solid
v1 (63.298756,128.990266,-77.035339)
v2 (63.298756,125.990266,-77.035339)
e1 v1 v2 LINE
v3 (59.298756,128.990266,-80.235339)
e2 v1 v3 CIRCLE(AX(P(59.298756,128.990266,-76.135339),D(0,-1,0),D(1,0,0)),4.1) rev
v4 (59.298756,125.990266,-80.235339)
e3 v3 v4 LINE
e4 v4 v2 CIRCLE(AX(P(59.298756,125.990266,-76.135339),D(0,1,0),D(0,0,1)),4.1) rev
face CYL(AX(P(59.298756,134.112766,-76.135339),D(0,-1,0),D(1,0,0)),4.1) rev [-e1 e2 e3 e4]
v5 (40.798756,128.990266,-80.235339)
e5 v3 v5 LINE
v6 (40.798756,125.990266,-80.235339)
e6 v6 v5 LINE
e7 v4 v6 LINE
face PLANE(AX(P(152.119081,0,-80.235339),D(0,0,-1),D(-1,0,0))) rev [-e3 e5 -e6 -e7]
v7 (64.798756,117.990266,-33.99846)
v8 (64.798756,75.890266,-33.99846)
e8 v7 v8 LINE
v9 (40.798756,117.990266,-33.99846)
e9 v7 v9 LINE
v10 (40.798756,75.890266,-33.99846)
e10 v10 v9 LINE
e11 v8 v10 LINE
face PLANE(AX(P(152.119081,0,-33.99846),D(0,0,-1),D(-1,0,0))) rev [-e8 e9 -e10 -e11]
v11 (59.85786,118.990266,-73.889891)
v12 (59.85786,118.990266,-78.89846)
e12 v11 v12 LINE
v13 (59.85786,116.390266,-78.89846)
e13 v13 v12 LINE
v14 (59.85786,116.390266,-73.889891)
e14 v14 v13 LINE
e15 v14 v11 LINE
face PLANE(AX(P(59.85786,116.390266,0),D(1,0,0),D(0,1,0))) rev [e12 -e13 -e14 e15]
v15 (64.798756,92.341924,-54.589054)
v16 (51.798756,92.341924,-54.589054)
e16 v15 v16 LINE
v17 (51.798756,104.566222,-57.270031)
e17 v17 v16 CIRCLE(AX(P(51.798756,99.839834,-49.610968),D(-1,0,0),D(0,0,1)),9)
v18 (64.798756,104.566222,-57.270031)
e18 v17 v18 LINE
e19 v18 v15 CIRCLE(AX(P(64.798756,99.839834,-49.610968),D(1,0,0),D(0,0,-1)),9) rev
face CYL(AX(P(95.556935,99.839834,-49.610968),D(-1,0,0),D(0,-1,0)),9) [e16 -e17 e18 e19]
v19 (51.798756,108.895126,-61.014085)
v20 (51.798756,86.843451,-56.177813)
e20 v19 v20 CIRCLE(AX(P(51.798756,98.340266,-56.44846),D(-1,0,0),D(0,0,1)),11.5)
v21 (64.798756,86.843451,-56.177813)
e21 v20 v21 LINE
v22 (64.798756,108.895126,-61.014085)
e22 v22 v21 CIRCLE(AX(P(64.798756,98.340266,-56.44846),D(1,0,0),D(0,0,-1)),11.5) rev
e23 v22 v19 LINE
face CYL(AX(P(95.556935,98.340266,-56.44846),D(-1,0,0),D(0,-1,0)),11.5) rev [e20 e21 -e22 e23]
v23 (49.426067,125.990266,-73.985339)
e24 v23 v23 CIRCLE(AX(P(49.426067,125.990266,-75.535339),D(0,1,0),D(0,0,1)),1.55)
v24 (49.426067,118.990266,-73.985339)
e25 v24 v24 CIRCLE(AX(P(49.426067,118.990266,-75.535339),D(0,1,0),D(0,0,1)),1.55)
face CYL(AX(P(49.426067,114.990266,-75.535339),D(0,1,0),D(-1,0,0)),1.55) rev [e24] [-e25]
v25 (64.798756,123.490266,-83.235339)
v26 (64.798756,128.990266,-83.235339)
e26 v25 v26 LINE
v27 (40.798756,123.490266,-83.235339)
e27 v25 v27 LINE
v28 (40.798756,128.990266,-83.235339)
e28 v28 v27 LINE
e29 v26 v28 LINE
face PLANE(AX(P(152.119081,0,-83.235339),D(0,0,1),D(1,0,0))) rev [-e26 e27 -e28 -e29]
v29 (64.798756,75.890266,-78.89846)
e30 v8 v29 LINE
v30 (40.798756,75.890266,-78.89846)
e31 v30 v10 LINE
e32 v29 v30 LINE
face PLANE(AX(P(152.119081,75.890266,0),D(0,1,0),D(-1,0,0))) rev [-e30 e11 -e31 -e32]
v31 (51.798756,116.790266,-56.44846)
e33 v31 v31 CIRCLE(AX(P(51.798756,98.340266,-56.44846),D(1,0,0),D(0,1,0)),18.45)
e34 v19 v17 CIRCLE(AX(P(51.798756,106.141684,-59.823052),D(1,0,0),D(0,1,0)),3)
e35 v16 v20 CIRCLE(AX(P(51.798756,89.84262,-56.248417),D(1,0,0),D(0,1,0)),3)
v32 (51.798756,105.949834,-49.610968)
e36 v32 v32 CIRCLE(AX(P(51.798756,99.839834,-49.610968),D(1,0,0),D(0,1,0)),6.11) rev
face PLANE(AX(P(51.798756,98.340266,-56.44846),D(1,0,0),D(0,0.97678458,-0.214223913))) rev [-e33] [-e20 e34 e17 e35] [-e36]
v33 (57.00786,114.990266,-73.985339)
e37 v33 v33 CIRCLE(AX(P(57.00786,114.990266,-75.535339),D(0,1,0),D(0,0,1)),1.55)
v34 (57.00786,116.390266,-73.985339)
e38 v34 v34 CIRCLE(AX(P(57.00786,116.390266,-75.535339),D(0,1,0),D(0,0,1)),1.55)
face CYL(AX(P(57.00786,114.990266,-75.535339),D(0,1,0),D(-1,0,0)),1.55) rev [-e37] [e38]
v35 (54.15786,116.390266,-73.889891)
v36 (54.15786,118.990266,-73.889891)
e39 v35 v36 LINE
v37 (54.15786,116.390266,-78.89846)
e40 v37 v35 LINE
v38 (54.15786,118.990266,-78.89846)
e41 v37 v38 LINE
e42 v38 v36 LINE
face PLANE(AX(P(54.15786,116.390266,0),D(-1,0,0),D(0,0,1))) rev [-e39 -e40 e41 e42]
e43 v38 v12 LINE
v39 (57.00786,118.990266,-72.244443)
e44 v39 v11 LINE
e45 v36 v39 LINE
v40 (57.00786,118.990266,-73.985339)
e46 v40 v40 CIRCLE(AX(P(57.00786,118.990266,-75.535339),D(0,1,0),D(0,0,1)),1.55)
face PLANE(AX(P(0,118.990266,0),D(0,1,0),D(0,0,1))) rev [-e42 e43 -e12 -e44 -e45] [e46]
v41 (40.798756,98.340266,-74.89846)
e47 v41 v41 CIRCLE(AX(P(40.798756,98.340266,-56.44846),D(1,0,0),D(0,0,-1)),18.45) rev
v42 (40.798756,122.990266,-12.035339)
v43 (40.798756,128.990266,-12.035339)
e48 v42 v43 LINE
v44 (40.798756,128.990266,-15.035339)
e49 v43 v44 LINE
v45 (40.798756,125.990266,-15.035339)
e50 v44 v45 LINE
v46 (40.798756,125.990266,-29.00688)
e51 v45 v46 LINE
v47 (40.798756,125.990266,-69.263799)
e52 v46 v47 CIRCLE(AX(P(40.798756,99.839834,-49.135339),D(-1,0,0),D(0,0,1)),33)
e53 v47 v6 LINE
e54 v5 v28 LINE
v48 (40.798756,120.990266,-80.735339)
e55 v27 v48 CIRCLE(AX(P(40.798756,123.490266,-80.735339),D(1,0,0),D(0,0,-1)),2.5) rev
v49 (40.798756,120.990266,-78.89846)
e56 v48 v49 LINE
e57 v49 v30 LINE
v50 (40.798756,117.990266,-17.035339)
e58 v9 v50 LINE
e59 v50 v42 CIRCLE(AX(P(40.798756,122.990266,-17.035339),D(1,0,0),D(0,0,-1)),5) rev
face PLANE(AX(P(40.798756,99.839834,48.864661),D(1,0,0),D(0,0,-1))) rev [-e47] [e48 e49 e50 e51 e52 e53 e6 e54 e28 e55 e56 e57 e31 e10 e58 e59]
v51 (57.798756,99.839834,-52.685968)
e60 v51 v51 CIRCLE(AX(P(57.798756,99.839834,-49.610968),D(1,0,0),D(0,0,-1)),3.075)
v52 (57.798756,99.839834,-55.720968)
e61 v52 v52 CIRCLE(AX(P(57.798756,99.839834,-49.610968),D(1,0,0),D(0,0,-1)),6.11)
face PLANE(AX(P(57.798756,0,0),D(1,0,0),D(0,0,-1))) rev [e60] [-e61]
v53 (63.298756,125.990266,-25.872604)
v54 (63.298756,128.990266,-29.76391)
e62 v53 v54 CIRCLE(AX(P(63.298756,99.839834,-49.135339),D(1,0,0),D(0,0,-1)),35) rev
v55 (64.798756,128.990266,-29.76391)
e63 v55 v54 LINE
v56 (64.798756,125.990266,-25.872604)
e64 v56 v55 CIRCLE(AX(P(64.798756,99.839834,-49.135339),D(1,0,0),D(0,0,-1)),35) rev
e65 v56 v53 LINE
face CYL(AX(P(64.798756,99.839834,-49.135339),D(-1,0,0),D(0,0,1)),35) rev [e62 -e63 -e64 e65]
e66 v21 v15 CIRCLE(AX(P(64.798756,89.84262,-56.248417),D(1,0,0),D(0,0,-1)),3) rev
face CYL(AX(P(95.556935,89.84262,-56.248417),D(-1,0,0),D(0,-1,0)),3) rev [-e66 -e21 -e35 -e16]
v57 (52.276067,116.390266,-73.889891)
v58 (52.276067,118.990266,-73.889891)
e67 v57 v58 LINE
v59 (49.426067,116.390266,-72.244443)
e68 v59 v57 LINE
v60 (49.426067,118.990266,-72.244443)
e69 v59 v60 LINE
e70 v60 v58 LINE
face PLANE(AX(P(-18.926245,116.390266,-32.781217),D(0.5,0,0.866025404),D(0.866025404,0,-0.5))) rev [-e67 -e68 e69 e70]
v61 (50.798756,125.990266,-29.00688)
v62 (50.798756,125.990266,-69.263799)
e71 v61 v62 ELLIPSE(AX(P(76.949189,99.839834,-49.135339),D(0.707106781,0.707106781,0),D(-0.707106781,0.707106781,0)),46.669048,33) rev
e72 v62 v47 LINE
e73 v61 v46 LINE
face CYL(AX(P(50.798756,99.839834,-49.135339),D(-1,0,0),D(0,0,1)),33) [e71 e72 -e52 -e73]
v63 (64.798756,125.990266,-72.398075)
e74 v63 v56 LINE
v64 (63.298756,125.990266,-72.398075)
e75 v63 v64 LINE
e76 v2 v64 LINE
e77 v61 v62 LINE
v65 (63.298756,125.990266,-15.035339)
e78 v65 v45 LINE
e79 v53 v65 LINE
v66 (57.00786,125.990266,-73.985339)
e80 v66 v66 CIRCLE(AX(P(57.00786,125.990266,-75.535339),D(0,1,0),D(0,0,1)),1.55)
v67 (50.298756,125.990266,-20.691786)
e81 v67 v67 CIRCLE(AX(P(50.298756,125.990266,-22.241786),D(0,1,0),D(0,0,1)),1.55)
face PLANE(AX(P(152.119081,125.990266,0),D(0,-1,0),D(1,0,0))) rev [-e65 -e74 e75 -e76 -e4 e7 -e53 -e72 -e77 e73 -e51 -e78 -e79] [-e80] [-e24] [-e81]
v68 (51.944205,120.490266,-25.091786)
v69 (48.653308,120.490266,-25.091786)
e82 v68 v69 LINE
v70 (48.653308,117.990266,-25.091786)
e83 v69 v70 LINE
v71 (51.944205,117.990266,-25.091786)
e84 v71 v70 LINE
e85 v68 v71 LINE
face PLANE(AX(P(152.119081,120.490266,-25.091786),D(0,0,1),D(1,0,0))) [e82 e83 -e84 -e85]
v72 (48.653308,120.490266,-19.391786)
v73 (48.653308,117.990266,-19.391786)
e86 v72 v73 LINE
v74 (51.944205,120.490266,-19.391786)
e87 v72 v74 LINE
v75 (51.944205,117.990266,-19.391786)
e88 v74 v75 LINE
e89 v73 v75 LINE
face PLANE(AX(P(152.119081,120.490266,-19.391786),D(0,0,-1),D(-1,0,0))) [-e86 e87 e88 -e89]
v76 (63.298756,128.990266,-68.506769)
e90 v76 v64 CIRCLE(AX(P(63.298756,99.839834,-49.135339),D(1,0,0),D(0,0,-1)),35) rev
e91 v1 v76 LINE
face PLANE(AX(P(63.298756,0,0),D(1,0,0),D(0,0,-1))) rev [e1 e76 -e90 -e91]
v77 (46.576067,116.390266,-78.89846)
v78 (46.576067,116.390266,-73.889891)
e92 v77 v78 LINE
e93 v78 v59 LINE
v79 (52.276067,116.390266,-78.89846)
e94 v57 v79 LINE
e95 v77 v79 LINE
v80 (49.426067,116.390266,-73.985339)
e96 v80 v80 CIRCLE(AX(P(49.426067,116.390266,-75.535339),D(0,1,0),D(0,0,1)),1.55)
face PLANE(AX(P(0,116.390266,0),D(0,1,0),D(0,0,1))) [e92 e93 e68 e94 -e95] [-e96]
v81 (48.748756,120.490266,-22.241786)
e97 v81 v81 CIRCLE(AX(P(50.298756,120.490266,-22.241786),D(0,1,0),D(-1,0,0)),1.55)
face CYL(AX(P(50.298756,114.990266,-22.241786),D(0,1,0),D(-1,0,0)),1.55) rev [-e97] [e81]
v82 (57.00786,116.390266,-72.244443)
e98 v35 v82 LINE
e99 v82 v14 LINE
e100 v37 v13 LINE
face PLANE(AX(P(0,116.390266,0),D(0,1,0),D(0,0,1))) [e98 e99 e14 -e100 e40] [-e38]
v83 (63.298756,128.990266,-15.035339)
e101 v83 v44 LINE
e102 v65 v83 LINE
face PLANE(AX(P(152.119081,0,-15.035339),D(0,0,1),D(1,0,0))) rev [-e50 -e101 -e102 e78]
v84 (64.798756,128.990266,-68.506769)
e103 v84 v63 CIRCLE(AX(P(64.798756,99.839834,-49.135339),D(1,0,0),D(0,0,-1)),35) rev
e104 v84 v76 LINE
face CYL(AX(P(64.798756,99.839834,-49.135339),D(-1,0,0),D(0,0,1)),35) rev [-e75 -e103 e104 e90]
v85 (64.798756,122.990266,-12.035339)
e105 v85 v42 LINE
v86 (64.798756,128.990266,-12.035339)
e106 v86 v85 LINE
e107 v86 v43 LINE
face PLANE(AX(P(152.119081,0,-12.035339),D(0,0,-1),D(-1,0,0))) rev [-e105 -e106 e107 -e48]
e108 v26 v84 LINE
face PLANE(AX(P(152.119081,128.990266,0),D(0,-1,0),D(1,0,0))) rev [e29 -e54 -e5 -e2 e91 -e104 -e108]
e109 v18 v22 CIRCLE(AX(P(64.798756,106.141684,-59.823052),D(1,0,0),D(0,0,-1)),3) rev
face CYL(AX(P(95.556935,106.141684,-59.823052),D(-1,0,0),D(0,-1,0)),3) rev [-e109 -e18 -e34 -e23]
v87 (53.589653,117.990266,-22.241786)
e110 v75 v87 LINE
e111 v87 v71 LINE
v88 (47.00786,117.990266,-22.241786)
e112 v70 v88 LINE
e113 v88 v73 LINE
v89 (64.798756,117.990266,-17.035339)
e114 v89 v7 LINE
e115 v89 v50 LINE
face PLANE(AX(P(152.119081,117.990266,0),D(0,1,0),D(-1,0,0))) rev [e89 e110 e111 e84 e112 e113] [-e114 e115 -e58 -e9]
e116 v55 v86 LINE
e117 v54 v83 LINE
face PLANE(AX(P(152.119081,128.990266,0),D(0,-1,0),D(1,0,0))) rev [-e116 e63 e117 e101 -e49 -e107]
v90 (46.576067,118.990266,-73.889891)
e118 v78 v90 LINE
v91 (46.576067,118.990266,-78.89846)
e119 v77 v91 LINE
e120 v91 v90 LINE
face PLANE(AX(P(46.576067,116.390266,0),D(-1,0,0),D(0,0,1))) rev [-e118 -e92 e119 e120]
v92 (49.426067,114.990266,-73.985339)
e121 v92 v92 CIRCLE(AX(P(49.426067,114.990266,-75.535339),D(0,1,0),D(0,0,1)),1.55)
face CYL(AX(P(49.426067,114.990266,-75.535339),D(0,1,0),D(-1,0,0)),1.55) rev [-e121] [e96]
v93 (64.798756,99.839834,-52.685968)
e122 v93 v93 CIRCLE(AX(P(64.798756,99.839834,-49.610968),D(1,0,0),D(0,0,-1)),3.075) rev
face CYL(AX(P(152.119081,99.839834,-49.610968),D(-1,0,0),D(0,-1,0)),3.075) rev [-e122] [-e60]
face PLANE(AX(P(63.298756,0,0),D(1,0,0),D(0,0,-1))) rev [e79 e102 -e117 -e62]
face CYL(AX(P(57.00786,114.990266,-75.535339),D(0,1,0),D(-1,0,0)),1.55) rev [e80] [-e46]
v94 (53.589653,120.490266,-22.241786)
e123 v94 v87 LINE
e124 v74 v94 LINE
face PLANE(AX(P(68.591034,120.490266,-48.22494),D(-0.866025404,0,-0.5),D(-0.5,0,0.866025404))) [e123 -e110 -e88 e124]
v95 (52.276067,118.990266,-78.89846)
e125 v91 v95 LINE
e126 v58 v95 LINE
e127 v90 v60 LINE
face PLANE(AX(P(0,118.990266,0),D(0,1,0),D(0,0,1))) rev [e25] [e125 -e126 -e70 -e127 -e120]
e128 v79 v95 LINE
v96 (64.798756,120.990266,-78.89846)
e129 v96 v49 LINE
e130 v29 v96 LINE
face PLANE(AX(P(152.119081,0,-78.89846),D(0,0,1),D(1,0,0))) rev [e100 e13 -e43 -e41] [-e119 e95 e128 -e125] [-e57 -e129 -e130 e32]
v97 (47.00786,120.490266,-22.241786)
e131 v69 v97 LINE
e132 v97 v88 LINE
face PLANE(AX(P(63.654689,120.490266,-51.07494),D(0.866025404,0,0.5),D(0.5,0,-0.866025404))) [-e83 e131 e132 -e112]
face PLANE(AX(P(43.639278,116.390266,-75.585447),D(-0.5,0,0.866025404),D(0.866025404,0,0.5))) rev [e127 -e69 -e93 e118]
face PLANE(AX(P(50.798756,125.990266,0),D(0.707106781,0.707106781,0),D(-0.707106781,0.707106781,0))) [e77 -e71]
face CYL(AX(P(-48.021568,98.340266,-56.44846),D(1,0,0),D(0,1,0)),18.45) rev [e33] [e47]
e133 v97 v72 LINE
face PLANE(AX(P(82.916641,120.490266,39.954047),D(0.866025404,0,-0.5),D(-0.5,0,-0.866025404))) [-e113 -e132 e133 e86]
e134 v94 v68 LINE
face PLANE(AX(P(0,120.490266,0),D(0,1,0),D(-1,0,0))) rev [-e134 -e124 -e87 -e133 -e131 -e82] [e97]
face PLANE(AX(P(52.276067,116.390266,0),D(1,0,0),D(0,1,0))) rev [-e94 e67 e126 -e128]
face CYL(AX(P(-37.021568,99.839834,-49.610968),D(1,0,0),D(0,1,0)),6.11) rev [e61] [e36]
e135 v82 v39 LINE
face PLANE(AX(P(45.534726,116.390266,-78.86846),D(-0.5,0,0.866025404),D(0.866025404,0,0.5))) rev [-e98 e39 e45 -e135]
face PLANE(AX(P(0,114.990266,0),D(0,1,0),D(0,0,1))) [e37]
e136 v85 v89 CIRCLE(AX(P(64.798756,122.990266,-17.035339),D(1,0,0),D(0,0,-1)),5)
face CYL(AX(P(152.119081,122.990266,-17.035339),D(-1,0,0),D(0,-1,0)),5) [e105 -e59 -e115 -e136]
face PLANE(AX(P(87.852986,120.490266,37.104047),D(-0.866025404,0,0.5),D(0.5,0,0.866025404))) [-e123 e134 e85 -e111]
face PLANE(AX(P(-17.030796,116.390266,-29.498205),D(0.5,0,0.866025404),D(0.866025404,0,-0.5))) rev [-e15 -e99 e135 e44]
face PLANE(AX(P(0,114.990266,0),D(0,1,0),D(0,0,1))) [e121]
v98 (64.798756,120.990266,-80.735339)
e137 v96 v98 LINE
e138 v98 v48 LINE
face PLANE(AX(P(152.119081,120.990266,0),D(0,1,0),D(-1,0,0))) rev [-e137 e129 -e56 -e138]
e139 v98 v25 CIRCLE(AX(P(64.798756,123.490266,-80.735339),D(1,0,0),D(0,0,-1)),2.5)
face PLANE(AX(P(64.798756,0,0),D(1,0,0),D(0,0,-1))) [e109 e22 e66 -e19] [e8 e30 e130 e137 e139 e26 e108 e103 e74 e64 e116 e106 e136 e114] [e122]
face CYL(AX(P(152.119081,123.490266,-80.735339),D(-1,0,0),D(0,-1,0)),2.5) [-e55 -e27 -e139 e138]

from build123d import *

# Parameters (mm, degrees)
SKETCH1_R           = 3.075
BOSS_EXTRUDE1_DEPTH = 5.5
BOSS_EXTRUDE2_START = -6
SKETCH1_3_R         = 6.11
BOSS_EXTRUDE2_DEPTH = 6
BOSS_EXTRUDE3_START = -17
SKETCH1_4_R         = 18.45
BOSS_EXTRUDE3_DEPTH = 11
BOSS_EXTRUDE4_DEPTH = 10
DRAFT1_ANGLE        = 45
BOSS_EXTRUDE5_DEPTH = 3
SKETCH4_R           = 3.075
BOSS_EXTRUDE6_DEPTH = 1.5
SKETCH3_3_R         = 1.55
CUT_EXTRUDE1_DEPTH  = 11
CUT_EXTRUDE2_START  = -7
SKETCH3_4_R         = 1.55
CUT_EXTRUDE2_DEPTH  = 2.6
CUT_EXTRUDE4_START  = -5.5
SKETCH3_5_R         = 1.55
CUT_EXTRUDE4_DEPTH  = 2.5
CUT_EXTRUDE5_START  = -13
CUT_EXTRUDE5_DEPTH  = 13
FILLET1_R           = 3


with BuildPart() as part:
    # Sketch1 → Boss-Extrude1 (new body)
    with BuildSketch(Plane(origin=(57.798756402, 0, 0), x_dir=(0, 0, -1), z_dir=(1, 0, 0))):
        with BuildLine():
            Line((33.998459558, 75.890266162), (78.898459558, 75.890266162))
            Line((78.898459558, 75.890266162), (78.898459558, 120.990266162))
            Line((78.898459558, 120.990266162), (80.735339486, 120.990266162))
            ThreePointArc((80.735339486, 120.990266162), (82.503106439, 121.722499209), (83.235339486, 123.490266162))
            Line((83.235339486, 123.490266162), (83.235339486, 128.990266162))
            Line((83.235339486, 128.990266162), (80.235339486, 128.990266162))
            Line((80.235339486, 128.990266162), (80.235339486, 125.990266162))
            Line((80.235339486, 125.990266162), (15.035339486, 125.990266162))
            Line((15.035339486, 125.990266162), (15.035339486, 128.990266162))
            Line((15.035339486, 128.990266162), (12.035339486, 128.990266162))
            Line((12.035339486, 128.990266162), (12.035339486, 122.990266162))
            ThreePointArc((12.035339486, 122.990266162), (13.49980558, 119.454732256), (17.035339486, 117.990266162))
            Line((17.035339486, 117.990266162), (33.998459558, 117.990266162))
            Line((33.998459558, 117.990266162), (33.998459558, 75.890266162))
        make_face()
        with Locations((49.610967501, 99.839833556)):
            Circle(SKETCH1_R, mode=Mode.SUBTRACT)
    extrude(amount=BOSS_EXTRUDE1_DEPTH)

    # Sketch1<3> → Boss-Extrude2 (add)
    with BuildSketch(Plane(origin=(57.798756402, 0, 0), x_dir=(0, 0, -1), z_dir=(1, 0, 0)).offset(BOSS_EXTRUDE2_START)):
        with BuildLine():
            Line((33.998459558, 75.890266162), (78.898459558, 75.890266162))
            Line((78.898459558, 75.890266162), (78.898459558, 120.990266162))
            Line((78.898459558, 120.990266162), (80.735339486, 120.990266162))
            ThreePointArc((80.735339486, 120.990266162), (82.503106439, 121.722499209), (83.235339486, 123.490266162))
            Line((83.235339486, 123.490266162), (83.235339486, 128.990266162))
            Line((83.235339486, 128.990266162), (80.235339486, 128.990266162))
            Line((80.235339486, 128.990266162), (80.235339486, 125.990266162))
            Line((80.235339486, 125.990266162), (15.035339486, 125.990266162))
            Line((15.035339486, 125.990266162), (15.035339486, 128.990266162))
            Line((15.035339486, 128.990266162), (12.035339486, 128.990266162))
            Line((12.035339486, 128.990266162), (12.035339486, 122.990266162))
            ThreePointArc((12.035339486, 122.990266162), (13.49980558, 119.454732256), (17.035339486, 117.990266162))
            Line((17.035339486, 117.990266162), (33.998459558, 117.990266162))
            Line((33.998459558, 117.990266162), (33.998459558, 75.890266162))
        make_face()
        with Locations(Location((49.610967501, 99.839833556, 0), (0, 0, 90))):
            Circle(SKETCH1_3_R, mode=Mode.SUBTRACT)
    extrude(amount=BOSS_EXTRUDE2_DEPTH)

    # Sketch1<4> → Boss-Extrude3 (add)
    with BuildSketch(Plane(origin=(57.798756402, 0, 0), x_dir=(0, 0, -1), z_dir=(1, 0, 0)).offset(BOSS_EXTRUDE3_START)):
        with BuildLine():
            Line((33.998459558, 75.890266162), (78.898459558, 75.890266162))
            Line((78.898459558, 75.890266162), (78.898459558, 120.990266162))
            Line((78.898459558, 120.990266162), (80.735339486, 120.990266162))
            ThreePointArc((80.735339486, 120.990266162), (82.503106439, 121.722499209), (83.235339486, 123.490266162))
            Line((83.235339486, 123.490266162), (83.235339486, 128.990266162))
            Line((83.235339486, 128.990266162), (80.235339486, 128.990266162))
            Line((80.235339486, 128.990266162), (80.235339486, 125.990266162))
            Line((80.235339486, 125.990266162), (15.035339486, 125.990266162))
            Line((15.035339486, 125.990266162), (15.035339486, 128.990266162))
            Line((15.035339486, 128.990266162), (12.035339486, 128.990266162))
            Line((12.035339486, 128.990266162), (12.035339486, 122.990266162))
            ThreePointArc((12.035339486, 122.990266162), (13.49980558, 119.454732256), (17.035339486, 117.990266162))
            Line((17.035339486, 117.990266162), (33.998459558, 117.990266162))
            Line((33.998459558, 117.990266162), (33.998459558, 75.890266162))
        make_face()
        with Locations(Location((56.448459558, 98.340266162, 0), (0, 0, 90))):
            Circle(SKETCH1_4_R, mode=Mode.SUBTRACT)
    extrude(amount=BOSS_EXTRUDE3_DEPTH)

    # Sketch2 → Boss-Extrude4 (add)
    with BuildSketch(Plane(origin=(40.798756402, 0, 0), x_dir=(0, 0, -1), z_dir=(1, 0, 0))):
        with BuildLine():
            ThreePointArc((69.263798804, 125.990266162), (49.135339486, 132.839833556), (29.006880169, 125.990266162))
            Line((29.006880169, 125.990266162), (69.263798804, 125.990266162))
        make_face()
    extrude(amount=BOSS_EXTRUDE4_DEPTH)

    # Draft1
    draft1_faces = [part.faces().sort_by_distance(p)[0] for p in [
        (50.798756402, 128.756028079, -49.135339486),
    ]]
    draft(draft1_faces, Plane(origin=(152.119080652, 125.990266162, 0), x_dir=(1, 0, 0), z_dir=(0, 1, 0)), DRAFT1_ANGLE)

    # Sketch3 → Boss-Extrude5 (add)
    with BuildSketch(Plane(origin=(0, 125.990266162, 0), x_dir=(1, 0, 0), z_dir=(0, 1, 0))):
        with BuildLine():
            Line((63.298756402, 80.235339486), (59.298756401, 80.235339486))
            ThreePointArc((59.298756401, 80.235339486), (61.860006097, 79.336901605), (63.298756402, 77.035339486))
            Line((63.298756402, 77.035339486), (63.298756402, 80.235339486))
        make_face()
    extrude(amount=BOSS_EXTRUDE5_DEPTH)

    # Sketch4 → Boss-Extrude6 (add)
    with BuildSketch(Plane(origin=(63.298756402, 0, 0), x_dir=(0, 0, -1), z_dir=(1, 0, 0))):
        with BuildLine():
            Line((29.763910038, 128.990266162), (12.035339486, 128.990266162))
            Line((12.035339486, 128.990266162), (12.035339486, 122.990266162))
            ThreePointArc((12.035339486, 122.990266162), (13.49980558, 119.454732256), (17.035339486, 117.990266162))
            Line((17.035339486, 117.990266162), (33.998459558, 117.990266162))
            Line((33.998459558, 117.990266162), (33.998459558, 75.890266162))
            Line((33.998459558, 75.890266162), (78.898459558, 75.890266162))
            Line((78.898459558, 75.890266162), (78.898459558, 120.990266162))
            Line((78.898459558, 120.990266162), (80.735339486, 120.990266162))
            ThreePointArc((80.735339486, 120.990266162), (82.503106439, 121.722499209), (83.235339486, 123.490266162))
            Line((83.235339486, 123.490266162), (83.235339486, 128.990266162))
            Line((83.235339486, 128.990266162), (68.506768934, 128.990266162))
            ThreePointArc((68.506768934, 128.990266162), (70.505131495, 127.558635649), (72.398075234, 125.990266162))
            Line((72.398075234, 125.990266162), (25.872603738, 125.990266162))
            ThreePointArc((25.872603738, 125.990266162), (27.765547478, 127.558635649), (29.763910038, 128.990266162))
        make_face()
        with Locations((49.610967501, 99.839833556)):
            Circle(SKETCH4_R, mode=Mode.SUBTRACT)
    extrude(amount=BOSS_EXTRUDE6_DEPTH)

    # Sketch3<3> → Cut-Extrude1 (cut)
    with BuildSketch(Plane(origin=(0, 125.990266162, 0), x_dir=(1, 0, 0), z_dir=(0, 1, 0))):
        with Locations(Location((49.426066799, 75.535339486, 0), (0, 0, 270))):
            Circle(SKETCH3_3_R)
        with Locations(Location((57.007859867, 75.535339486, 0), (0, 0, 270))):
            Circle(SKETCH3_3_R)
        with Locations(Location((50.298756402, 22.24178562, 0), (0, 0, 180))):
            Circle(SKETCH3_3_R)
    extrude(amount=-CUT_EXTRUDE1_DEPTH, mode=Mode.SUBTRACT)

    # Sketch3<4> → Cut-Extrude2 (cut)
    # profile 1 of 4: a face of its own
    with BuildSketch(Plane(origin=(0, 125.990266162, 0), x_dir=(1, 0, 0), z_dir=(0, 1, 0)).offset(CUT_EXTRUDE2_START)):
        Polygon((54.157859867, 77.180787753), (54.157859867, 73.889891219), (57.007859867, 72.244442952), (59.857859867, 73.889891219), (59.857859867, 77.180787753), (57.007859867, 78.826236021), align=None)
        with Locations(Location((57.007859867, 75.535339486, 0), (0, 0, 270))):
            Circle(SKETCH3_4_R, mode=Mode.SUBTRACT)
    # profile 2 of 4: a face of its own
    with BuildSketch(Plane(origin=(0, 125.990266162, 0), x_dir=(1, 0, 0), z_dir=(0, 1, 0)).offset(CUT_EXTRUDE2_START)):
        Polygon((46.576066799, 77.180787753), (46.576066799, 73.889891219), (49.426066799, 72.244442952), (52.276066799, 73.889891219), (52.276066799, 77.180787753), (49.426066799, 78.826236021), align=None)
        with Locations(Location((49.426066799, 75.535339486, 0), (0, 0, 270))):
            Circle(SKETCH3_4_R, mode=Mode.SUBTRACT)
    # profile 3 of 4: a face of its own
    with BuildSketch(Plane(origin=(0, 125.990266162, 0), x_dir=(1, 0, 0), z_dir=(0, 1, 0)).offset(CUT_EXTRUDE2_START)):
        Polygon((59.857859867, 78.898459558), (59.857859867, 77.180787753), (57.007859867, 78.826236021), (54.157859867, 77.180787753), (54.157859867, 78.898459558), align=None)
    # profile 4 of 4: a face of its own
    with BuildSketch(Plane(origin=(0, 125.990266162, 0), x_dir=(1, 0, 0), z_dir=(0, 1, 0)).offset(CUT_EXTRUDE2_START)):
        Polygon((52.276066799, 78.898459558), (52.276066799, 77.180787753), (49.426066799, 78.826236021), (46.576066799, 77.180787753), (46.576066799, 78.898459558), align=None)
    extrude(amount=-CUT_EXTRUDE2_DEPTH, mode=Mode.SUBTRACT)

    # Sketch3<5> → Cut-Extrude4 (cut)
    with BuildSketch(Plane(origin=(0, 125.990266162, 0), x_dir=(1, 0, 0), z_dir=(0, 1, 0)).offset(CUT_EXTRUDE4_START)):
        Polygon((48.653308134, 19.39178562), (51.944204669, 19.39178562), (53.589652936, 22.24178562), (51.944204669, 25.09178562), (48.653308134, 25.09178562), (47.007859867, 22.24178562), align=None)
        with Locations(Location((50.298756402, 22.24178562, 0), (0, 0, 180))):
            Circle(SKETCH3_5_R, mode=Mode.SUBTRACT)
    extrude(amount=-CUT_EXTRUDE4_DEPTH, mode=Mode.SUBTRACT)

    # Sketch6 → Cut-Extrude5 (cut)
    with BuildSketch(Plane.ZY.offset(-51.798756402).offset(CUT_EXTRUDE5_START)):
        with BuildLine():
            ThreePointArc((-47.52627647, 91.08460293), (-58.402028717, 97.911818335), (-51.38169206, 108.663921867))
            ThreePointArc((-51.38169206, 108.663921867), (-67.681482224, 95.876691159), (-47.52627647, 91.08460293))
        make_face()
    extrude(amount=CUT_EXTRUDE5_DEPTH, mode=Mode.SUBTRACT)

    # Fillet1
    fillet1_edges = [part.edges().sort_by_distance(p)[0] for p in [
        (58.298756402, 91.08460293, -47.52627647),
        (58.298756402, 108.663921867, -51.38169206),
    ]]
    fillet(fillet1_edges, radius=FILLET1_R)


solid = part.part
